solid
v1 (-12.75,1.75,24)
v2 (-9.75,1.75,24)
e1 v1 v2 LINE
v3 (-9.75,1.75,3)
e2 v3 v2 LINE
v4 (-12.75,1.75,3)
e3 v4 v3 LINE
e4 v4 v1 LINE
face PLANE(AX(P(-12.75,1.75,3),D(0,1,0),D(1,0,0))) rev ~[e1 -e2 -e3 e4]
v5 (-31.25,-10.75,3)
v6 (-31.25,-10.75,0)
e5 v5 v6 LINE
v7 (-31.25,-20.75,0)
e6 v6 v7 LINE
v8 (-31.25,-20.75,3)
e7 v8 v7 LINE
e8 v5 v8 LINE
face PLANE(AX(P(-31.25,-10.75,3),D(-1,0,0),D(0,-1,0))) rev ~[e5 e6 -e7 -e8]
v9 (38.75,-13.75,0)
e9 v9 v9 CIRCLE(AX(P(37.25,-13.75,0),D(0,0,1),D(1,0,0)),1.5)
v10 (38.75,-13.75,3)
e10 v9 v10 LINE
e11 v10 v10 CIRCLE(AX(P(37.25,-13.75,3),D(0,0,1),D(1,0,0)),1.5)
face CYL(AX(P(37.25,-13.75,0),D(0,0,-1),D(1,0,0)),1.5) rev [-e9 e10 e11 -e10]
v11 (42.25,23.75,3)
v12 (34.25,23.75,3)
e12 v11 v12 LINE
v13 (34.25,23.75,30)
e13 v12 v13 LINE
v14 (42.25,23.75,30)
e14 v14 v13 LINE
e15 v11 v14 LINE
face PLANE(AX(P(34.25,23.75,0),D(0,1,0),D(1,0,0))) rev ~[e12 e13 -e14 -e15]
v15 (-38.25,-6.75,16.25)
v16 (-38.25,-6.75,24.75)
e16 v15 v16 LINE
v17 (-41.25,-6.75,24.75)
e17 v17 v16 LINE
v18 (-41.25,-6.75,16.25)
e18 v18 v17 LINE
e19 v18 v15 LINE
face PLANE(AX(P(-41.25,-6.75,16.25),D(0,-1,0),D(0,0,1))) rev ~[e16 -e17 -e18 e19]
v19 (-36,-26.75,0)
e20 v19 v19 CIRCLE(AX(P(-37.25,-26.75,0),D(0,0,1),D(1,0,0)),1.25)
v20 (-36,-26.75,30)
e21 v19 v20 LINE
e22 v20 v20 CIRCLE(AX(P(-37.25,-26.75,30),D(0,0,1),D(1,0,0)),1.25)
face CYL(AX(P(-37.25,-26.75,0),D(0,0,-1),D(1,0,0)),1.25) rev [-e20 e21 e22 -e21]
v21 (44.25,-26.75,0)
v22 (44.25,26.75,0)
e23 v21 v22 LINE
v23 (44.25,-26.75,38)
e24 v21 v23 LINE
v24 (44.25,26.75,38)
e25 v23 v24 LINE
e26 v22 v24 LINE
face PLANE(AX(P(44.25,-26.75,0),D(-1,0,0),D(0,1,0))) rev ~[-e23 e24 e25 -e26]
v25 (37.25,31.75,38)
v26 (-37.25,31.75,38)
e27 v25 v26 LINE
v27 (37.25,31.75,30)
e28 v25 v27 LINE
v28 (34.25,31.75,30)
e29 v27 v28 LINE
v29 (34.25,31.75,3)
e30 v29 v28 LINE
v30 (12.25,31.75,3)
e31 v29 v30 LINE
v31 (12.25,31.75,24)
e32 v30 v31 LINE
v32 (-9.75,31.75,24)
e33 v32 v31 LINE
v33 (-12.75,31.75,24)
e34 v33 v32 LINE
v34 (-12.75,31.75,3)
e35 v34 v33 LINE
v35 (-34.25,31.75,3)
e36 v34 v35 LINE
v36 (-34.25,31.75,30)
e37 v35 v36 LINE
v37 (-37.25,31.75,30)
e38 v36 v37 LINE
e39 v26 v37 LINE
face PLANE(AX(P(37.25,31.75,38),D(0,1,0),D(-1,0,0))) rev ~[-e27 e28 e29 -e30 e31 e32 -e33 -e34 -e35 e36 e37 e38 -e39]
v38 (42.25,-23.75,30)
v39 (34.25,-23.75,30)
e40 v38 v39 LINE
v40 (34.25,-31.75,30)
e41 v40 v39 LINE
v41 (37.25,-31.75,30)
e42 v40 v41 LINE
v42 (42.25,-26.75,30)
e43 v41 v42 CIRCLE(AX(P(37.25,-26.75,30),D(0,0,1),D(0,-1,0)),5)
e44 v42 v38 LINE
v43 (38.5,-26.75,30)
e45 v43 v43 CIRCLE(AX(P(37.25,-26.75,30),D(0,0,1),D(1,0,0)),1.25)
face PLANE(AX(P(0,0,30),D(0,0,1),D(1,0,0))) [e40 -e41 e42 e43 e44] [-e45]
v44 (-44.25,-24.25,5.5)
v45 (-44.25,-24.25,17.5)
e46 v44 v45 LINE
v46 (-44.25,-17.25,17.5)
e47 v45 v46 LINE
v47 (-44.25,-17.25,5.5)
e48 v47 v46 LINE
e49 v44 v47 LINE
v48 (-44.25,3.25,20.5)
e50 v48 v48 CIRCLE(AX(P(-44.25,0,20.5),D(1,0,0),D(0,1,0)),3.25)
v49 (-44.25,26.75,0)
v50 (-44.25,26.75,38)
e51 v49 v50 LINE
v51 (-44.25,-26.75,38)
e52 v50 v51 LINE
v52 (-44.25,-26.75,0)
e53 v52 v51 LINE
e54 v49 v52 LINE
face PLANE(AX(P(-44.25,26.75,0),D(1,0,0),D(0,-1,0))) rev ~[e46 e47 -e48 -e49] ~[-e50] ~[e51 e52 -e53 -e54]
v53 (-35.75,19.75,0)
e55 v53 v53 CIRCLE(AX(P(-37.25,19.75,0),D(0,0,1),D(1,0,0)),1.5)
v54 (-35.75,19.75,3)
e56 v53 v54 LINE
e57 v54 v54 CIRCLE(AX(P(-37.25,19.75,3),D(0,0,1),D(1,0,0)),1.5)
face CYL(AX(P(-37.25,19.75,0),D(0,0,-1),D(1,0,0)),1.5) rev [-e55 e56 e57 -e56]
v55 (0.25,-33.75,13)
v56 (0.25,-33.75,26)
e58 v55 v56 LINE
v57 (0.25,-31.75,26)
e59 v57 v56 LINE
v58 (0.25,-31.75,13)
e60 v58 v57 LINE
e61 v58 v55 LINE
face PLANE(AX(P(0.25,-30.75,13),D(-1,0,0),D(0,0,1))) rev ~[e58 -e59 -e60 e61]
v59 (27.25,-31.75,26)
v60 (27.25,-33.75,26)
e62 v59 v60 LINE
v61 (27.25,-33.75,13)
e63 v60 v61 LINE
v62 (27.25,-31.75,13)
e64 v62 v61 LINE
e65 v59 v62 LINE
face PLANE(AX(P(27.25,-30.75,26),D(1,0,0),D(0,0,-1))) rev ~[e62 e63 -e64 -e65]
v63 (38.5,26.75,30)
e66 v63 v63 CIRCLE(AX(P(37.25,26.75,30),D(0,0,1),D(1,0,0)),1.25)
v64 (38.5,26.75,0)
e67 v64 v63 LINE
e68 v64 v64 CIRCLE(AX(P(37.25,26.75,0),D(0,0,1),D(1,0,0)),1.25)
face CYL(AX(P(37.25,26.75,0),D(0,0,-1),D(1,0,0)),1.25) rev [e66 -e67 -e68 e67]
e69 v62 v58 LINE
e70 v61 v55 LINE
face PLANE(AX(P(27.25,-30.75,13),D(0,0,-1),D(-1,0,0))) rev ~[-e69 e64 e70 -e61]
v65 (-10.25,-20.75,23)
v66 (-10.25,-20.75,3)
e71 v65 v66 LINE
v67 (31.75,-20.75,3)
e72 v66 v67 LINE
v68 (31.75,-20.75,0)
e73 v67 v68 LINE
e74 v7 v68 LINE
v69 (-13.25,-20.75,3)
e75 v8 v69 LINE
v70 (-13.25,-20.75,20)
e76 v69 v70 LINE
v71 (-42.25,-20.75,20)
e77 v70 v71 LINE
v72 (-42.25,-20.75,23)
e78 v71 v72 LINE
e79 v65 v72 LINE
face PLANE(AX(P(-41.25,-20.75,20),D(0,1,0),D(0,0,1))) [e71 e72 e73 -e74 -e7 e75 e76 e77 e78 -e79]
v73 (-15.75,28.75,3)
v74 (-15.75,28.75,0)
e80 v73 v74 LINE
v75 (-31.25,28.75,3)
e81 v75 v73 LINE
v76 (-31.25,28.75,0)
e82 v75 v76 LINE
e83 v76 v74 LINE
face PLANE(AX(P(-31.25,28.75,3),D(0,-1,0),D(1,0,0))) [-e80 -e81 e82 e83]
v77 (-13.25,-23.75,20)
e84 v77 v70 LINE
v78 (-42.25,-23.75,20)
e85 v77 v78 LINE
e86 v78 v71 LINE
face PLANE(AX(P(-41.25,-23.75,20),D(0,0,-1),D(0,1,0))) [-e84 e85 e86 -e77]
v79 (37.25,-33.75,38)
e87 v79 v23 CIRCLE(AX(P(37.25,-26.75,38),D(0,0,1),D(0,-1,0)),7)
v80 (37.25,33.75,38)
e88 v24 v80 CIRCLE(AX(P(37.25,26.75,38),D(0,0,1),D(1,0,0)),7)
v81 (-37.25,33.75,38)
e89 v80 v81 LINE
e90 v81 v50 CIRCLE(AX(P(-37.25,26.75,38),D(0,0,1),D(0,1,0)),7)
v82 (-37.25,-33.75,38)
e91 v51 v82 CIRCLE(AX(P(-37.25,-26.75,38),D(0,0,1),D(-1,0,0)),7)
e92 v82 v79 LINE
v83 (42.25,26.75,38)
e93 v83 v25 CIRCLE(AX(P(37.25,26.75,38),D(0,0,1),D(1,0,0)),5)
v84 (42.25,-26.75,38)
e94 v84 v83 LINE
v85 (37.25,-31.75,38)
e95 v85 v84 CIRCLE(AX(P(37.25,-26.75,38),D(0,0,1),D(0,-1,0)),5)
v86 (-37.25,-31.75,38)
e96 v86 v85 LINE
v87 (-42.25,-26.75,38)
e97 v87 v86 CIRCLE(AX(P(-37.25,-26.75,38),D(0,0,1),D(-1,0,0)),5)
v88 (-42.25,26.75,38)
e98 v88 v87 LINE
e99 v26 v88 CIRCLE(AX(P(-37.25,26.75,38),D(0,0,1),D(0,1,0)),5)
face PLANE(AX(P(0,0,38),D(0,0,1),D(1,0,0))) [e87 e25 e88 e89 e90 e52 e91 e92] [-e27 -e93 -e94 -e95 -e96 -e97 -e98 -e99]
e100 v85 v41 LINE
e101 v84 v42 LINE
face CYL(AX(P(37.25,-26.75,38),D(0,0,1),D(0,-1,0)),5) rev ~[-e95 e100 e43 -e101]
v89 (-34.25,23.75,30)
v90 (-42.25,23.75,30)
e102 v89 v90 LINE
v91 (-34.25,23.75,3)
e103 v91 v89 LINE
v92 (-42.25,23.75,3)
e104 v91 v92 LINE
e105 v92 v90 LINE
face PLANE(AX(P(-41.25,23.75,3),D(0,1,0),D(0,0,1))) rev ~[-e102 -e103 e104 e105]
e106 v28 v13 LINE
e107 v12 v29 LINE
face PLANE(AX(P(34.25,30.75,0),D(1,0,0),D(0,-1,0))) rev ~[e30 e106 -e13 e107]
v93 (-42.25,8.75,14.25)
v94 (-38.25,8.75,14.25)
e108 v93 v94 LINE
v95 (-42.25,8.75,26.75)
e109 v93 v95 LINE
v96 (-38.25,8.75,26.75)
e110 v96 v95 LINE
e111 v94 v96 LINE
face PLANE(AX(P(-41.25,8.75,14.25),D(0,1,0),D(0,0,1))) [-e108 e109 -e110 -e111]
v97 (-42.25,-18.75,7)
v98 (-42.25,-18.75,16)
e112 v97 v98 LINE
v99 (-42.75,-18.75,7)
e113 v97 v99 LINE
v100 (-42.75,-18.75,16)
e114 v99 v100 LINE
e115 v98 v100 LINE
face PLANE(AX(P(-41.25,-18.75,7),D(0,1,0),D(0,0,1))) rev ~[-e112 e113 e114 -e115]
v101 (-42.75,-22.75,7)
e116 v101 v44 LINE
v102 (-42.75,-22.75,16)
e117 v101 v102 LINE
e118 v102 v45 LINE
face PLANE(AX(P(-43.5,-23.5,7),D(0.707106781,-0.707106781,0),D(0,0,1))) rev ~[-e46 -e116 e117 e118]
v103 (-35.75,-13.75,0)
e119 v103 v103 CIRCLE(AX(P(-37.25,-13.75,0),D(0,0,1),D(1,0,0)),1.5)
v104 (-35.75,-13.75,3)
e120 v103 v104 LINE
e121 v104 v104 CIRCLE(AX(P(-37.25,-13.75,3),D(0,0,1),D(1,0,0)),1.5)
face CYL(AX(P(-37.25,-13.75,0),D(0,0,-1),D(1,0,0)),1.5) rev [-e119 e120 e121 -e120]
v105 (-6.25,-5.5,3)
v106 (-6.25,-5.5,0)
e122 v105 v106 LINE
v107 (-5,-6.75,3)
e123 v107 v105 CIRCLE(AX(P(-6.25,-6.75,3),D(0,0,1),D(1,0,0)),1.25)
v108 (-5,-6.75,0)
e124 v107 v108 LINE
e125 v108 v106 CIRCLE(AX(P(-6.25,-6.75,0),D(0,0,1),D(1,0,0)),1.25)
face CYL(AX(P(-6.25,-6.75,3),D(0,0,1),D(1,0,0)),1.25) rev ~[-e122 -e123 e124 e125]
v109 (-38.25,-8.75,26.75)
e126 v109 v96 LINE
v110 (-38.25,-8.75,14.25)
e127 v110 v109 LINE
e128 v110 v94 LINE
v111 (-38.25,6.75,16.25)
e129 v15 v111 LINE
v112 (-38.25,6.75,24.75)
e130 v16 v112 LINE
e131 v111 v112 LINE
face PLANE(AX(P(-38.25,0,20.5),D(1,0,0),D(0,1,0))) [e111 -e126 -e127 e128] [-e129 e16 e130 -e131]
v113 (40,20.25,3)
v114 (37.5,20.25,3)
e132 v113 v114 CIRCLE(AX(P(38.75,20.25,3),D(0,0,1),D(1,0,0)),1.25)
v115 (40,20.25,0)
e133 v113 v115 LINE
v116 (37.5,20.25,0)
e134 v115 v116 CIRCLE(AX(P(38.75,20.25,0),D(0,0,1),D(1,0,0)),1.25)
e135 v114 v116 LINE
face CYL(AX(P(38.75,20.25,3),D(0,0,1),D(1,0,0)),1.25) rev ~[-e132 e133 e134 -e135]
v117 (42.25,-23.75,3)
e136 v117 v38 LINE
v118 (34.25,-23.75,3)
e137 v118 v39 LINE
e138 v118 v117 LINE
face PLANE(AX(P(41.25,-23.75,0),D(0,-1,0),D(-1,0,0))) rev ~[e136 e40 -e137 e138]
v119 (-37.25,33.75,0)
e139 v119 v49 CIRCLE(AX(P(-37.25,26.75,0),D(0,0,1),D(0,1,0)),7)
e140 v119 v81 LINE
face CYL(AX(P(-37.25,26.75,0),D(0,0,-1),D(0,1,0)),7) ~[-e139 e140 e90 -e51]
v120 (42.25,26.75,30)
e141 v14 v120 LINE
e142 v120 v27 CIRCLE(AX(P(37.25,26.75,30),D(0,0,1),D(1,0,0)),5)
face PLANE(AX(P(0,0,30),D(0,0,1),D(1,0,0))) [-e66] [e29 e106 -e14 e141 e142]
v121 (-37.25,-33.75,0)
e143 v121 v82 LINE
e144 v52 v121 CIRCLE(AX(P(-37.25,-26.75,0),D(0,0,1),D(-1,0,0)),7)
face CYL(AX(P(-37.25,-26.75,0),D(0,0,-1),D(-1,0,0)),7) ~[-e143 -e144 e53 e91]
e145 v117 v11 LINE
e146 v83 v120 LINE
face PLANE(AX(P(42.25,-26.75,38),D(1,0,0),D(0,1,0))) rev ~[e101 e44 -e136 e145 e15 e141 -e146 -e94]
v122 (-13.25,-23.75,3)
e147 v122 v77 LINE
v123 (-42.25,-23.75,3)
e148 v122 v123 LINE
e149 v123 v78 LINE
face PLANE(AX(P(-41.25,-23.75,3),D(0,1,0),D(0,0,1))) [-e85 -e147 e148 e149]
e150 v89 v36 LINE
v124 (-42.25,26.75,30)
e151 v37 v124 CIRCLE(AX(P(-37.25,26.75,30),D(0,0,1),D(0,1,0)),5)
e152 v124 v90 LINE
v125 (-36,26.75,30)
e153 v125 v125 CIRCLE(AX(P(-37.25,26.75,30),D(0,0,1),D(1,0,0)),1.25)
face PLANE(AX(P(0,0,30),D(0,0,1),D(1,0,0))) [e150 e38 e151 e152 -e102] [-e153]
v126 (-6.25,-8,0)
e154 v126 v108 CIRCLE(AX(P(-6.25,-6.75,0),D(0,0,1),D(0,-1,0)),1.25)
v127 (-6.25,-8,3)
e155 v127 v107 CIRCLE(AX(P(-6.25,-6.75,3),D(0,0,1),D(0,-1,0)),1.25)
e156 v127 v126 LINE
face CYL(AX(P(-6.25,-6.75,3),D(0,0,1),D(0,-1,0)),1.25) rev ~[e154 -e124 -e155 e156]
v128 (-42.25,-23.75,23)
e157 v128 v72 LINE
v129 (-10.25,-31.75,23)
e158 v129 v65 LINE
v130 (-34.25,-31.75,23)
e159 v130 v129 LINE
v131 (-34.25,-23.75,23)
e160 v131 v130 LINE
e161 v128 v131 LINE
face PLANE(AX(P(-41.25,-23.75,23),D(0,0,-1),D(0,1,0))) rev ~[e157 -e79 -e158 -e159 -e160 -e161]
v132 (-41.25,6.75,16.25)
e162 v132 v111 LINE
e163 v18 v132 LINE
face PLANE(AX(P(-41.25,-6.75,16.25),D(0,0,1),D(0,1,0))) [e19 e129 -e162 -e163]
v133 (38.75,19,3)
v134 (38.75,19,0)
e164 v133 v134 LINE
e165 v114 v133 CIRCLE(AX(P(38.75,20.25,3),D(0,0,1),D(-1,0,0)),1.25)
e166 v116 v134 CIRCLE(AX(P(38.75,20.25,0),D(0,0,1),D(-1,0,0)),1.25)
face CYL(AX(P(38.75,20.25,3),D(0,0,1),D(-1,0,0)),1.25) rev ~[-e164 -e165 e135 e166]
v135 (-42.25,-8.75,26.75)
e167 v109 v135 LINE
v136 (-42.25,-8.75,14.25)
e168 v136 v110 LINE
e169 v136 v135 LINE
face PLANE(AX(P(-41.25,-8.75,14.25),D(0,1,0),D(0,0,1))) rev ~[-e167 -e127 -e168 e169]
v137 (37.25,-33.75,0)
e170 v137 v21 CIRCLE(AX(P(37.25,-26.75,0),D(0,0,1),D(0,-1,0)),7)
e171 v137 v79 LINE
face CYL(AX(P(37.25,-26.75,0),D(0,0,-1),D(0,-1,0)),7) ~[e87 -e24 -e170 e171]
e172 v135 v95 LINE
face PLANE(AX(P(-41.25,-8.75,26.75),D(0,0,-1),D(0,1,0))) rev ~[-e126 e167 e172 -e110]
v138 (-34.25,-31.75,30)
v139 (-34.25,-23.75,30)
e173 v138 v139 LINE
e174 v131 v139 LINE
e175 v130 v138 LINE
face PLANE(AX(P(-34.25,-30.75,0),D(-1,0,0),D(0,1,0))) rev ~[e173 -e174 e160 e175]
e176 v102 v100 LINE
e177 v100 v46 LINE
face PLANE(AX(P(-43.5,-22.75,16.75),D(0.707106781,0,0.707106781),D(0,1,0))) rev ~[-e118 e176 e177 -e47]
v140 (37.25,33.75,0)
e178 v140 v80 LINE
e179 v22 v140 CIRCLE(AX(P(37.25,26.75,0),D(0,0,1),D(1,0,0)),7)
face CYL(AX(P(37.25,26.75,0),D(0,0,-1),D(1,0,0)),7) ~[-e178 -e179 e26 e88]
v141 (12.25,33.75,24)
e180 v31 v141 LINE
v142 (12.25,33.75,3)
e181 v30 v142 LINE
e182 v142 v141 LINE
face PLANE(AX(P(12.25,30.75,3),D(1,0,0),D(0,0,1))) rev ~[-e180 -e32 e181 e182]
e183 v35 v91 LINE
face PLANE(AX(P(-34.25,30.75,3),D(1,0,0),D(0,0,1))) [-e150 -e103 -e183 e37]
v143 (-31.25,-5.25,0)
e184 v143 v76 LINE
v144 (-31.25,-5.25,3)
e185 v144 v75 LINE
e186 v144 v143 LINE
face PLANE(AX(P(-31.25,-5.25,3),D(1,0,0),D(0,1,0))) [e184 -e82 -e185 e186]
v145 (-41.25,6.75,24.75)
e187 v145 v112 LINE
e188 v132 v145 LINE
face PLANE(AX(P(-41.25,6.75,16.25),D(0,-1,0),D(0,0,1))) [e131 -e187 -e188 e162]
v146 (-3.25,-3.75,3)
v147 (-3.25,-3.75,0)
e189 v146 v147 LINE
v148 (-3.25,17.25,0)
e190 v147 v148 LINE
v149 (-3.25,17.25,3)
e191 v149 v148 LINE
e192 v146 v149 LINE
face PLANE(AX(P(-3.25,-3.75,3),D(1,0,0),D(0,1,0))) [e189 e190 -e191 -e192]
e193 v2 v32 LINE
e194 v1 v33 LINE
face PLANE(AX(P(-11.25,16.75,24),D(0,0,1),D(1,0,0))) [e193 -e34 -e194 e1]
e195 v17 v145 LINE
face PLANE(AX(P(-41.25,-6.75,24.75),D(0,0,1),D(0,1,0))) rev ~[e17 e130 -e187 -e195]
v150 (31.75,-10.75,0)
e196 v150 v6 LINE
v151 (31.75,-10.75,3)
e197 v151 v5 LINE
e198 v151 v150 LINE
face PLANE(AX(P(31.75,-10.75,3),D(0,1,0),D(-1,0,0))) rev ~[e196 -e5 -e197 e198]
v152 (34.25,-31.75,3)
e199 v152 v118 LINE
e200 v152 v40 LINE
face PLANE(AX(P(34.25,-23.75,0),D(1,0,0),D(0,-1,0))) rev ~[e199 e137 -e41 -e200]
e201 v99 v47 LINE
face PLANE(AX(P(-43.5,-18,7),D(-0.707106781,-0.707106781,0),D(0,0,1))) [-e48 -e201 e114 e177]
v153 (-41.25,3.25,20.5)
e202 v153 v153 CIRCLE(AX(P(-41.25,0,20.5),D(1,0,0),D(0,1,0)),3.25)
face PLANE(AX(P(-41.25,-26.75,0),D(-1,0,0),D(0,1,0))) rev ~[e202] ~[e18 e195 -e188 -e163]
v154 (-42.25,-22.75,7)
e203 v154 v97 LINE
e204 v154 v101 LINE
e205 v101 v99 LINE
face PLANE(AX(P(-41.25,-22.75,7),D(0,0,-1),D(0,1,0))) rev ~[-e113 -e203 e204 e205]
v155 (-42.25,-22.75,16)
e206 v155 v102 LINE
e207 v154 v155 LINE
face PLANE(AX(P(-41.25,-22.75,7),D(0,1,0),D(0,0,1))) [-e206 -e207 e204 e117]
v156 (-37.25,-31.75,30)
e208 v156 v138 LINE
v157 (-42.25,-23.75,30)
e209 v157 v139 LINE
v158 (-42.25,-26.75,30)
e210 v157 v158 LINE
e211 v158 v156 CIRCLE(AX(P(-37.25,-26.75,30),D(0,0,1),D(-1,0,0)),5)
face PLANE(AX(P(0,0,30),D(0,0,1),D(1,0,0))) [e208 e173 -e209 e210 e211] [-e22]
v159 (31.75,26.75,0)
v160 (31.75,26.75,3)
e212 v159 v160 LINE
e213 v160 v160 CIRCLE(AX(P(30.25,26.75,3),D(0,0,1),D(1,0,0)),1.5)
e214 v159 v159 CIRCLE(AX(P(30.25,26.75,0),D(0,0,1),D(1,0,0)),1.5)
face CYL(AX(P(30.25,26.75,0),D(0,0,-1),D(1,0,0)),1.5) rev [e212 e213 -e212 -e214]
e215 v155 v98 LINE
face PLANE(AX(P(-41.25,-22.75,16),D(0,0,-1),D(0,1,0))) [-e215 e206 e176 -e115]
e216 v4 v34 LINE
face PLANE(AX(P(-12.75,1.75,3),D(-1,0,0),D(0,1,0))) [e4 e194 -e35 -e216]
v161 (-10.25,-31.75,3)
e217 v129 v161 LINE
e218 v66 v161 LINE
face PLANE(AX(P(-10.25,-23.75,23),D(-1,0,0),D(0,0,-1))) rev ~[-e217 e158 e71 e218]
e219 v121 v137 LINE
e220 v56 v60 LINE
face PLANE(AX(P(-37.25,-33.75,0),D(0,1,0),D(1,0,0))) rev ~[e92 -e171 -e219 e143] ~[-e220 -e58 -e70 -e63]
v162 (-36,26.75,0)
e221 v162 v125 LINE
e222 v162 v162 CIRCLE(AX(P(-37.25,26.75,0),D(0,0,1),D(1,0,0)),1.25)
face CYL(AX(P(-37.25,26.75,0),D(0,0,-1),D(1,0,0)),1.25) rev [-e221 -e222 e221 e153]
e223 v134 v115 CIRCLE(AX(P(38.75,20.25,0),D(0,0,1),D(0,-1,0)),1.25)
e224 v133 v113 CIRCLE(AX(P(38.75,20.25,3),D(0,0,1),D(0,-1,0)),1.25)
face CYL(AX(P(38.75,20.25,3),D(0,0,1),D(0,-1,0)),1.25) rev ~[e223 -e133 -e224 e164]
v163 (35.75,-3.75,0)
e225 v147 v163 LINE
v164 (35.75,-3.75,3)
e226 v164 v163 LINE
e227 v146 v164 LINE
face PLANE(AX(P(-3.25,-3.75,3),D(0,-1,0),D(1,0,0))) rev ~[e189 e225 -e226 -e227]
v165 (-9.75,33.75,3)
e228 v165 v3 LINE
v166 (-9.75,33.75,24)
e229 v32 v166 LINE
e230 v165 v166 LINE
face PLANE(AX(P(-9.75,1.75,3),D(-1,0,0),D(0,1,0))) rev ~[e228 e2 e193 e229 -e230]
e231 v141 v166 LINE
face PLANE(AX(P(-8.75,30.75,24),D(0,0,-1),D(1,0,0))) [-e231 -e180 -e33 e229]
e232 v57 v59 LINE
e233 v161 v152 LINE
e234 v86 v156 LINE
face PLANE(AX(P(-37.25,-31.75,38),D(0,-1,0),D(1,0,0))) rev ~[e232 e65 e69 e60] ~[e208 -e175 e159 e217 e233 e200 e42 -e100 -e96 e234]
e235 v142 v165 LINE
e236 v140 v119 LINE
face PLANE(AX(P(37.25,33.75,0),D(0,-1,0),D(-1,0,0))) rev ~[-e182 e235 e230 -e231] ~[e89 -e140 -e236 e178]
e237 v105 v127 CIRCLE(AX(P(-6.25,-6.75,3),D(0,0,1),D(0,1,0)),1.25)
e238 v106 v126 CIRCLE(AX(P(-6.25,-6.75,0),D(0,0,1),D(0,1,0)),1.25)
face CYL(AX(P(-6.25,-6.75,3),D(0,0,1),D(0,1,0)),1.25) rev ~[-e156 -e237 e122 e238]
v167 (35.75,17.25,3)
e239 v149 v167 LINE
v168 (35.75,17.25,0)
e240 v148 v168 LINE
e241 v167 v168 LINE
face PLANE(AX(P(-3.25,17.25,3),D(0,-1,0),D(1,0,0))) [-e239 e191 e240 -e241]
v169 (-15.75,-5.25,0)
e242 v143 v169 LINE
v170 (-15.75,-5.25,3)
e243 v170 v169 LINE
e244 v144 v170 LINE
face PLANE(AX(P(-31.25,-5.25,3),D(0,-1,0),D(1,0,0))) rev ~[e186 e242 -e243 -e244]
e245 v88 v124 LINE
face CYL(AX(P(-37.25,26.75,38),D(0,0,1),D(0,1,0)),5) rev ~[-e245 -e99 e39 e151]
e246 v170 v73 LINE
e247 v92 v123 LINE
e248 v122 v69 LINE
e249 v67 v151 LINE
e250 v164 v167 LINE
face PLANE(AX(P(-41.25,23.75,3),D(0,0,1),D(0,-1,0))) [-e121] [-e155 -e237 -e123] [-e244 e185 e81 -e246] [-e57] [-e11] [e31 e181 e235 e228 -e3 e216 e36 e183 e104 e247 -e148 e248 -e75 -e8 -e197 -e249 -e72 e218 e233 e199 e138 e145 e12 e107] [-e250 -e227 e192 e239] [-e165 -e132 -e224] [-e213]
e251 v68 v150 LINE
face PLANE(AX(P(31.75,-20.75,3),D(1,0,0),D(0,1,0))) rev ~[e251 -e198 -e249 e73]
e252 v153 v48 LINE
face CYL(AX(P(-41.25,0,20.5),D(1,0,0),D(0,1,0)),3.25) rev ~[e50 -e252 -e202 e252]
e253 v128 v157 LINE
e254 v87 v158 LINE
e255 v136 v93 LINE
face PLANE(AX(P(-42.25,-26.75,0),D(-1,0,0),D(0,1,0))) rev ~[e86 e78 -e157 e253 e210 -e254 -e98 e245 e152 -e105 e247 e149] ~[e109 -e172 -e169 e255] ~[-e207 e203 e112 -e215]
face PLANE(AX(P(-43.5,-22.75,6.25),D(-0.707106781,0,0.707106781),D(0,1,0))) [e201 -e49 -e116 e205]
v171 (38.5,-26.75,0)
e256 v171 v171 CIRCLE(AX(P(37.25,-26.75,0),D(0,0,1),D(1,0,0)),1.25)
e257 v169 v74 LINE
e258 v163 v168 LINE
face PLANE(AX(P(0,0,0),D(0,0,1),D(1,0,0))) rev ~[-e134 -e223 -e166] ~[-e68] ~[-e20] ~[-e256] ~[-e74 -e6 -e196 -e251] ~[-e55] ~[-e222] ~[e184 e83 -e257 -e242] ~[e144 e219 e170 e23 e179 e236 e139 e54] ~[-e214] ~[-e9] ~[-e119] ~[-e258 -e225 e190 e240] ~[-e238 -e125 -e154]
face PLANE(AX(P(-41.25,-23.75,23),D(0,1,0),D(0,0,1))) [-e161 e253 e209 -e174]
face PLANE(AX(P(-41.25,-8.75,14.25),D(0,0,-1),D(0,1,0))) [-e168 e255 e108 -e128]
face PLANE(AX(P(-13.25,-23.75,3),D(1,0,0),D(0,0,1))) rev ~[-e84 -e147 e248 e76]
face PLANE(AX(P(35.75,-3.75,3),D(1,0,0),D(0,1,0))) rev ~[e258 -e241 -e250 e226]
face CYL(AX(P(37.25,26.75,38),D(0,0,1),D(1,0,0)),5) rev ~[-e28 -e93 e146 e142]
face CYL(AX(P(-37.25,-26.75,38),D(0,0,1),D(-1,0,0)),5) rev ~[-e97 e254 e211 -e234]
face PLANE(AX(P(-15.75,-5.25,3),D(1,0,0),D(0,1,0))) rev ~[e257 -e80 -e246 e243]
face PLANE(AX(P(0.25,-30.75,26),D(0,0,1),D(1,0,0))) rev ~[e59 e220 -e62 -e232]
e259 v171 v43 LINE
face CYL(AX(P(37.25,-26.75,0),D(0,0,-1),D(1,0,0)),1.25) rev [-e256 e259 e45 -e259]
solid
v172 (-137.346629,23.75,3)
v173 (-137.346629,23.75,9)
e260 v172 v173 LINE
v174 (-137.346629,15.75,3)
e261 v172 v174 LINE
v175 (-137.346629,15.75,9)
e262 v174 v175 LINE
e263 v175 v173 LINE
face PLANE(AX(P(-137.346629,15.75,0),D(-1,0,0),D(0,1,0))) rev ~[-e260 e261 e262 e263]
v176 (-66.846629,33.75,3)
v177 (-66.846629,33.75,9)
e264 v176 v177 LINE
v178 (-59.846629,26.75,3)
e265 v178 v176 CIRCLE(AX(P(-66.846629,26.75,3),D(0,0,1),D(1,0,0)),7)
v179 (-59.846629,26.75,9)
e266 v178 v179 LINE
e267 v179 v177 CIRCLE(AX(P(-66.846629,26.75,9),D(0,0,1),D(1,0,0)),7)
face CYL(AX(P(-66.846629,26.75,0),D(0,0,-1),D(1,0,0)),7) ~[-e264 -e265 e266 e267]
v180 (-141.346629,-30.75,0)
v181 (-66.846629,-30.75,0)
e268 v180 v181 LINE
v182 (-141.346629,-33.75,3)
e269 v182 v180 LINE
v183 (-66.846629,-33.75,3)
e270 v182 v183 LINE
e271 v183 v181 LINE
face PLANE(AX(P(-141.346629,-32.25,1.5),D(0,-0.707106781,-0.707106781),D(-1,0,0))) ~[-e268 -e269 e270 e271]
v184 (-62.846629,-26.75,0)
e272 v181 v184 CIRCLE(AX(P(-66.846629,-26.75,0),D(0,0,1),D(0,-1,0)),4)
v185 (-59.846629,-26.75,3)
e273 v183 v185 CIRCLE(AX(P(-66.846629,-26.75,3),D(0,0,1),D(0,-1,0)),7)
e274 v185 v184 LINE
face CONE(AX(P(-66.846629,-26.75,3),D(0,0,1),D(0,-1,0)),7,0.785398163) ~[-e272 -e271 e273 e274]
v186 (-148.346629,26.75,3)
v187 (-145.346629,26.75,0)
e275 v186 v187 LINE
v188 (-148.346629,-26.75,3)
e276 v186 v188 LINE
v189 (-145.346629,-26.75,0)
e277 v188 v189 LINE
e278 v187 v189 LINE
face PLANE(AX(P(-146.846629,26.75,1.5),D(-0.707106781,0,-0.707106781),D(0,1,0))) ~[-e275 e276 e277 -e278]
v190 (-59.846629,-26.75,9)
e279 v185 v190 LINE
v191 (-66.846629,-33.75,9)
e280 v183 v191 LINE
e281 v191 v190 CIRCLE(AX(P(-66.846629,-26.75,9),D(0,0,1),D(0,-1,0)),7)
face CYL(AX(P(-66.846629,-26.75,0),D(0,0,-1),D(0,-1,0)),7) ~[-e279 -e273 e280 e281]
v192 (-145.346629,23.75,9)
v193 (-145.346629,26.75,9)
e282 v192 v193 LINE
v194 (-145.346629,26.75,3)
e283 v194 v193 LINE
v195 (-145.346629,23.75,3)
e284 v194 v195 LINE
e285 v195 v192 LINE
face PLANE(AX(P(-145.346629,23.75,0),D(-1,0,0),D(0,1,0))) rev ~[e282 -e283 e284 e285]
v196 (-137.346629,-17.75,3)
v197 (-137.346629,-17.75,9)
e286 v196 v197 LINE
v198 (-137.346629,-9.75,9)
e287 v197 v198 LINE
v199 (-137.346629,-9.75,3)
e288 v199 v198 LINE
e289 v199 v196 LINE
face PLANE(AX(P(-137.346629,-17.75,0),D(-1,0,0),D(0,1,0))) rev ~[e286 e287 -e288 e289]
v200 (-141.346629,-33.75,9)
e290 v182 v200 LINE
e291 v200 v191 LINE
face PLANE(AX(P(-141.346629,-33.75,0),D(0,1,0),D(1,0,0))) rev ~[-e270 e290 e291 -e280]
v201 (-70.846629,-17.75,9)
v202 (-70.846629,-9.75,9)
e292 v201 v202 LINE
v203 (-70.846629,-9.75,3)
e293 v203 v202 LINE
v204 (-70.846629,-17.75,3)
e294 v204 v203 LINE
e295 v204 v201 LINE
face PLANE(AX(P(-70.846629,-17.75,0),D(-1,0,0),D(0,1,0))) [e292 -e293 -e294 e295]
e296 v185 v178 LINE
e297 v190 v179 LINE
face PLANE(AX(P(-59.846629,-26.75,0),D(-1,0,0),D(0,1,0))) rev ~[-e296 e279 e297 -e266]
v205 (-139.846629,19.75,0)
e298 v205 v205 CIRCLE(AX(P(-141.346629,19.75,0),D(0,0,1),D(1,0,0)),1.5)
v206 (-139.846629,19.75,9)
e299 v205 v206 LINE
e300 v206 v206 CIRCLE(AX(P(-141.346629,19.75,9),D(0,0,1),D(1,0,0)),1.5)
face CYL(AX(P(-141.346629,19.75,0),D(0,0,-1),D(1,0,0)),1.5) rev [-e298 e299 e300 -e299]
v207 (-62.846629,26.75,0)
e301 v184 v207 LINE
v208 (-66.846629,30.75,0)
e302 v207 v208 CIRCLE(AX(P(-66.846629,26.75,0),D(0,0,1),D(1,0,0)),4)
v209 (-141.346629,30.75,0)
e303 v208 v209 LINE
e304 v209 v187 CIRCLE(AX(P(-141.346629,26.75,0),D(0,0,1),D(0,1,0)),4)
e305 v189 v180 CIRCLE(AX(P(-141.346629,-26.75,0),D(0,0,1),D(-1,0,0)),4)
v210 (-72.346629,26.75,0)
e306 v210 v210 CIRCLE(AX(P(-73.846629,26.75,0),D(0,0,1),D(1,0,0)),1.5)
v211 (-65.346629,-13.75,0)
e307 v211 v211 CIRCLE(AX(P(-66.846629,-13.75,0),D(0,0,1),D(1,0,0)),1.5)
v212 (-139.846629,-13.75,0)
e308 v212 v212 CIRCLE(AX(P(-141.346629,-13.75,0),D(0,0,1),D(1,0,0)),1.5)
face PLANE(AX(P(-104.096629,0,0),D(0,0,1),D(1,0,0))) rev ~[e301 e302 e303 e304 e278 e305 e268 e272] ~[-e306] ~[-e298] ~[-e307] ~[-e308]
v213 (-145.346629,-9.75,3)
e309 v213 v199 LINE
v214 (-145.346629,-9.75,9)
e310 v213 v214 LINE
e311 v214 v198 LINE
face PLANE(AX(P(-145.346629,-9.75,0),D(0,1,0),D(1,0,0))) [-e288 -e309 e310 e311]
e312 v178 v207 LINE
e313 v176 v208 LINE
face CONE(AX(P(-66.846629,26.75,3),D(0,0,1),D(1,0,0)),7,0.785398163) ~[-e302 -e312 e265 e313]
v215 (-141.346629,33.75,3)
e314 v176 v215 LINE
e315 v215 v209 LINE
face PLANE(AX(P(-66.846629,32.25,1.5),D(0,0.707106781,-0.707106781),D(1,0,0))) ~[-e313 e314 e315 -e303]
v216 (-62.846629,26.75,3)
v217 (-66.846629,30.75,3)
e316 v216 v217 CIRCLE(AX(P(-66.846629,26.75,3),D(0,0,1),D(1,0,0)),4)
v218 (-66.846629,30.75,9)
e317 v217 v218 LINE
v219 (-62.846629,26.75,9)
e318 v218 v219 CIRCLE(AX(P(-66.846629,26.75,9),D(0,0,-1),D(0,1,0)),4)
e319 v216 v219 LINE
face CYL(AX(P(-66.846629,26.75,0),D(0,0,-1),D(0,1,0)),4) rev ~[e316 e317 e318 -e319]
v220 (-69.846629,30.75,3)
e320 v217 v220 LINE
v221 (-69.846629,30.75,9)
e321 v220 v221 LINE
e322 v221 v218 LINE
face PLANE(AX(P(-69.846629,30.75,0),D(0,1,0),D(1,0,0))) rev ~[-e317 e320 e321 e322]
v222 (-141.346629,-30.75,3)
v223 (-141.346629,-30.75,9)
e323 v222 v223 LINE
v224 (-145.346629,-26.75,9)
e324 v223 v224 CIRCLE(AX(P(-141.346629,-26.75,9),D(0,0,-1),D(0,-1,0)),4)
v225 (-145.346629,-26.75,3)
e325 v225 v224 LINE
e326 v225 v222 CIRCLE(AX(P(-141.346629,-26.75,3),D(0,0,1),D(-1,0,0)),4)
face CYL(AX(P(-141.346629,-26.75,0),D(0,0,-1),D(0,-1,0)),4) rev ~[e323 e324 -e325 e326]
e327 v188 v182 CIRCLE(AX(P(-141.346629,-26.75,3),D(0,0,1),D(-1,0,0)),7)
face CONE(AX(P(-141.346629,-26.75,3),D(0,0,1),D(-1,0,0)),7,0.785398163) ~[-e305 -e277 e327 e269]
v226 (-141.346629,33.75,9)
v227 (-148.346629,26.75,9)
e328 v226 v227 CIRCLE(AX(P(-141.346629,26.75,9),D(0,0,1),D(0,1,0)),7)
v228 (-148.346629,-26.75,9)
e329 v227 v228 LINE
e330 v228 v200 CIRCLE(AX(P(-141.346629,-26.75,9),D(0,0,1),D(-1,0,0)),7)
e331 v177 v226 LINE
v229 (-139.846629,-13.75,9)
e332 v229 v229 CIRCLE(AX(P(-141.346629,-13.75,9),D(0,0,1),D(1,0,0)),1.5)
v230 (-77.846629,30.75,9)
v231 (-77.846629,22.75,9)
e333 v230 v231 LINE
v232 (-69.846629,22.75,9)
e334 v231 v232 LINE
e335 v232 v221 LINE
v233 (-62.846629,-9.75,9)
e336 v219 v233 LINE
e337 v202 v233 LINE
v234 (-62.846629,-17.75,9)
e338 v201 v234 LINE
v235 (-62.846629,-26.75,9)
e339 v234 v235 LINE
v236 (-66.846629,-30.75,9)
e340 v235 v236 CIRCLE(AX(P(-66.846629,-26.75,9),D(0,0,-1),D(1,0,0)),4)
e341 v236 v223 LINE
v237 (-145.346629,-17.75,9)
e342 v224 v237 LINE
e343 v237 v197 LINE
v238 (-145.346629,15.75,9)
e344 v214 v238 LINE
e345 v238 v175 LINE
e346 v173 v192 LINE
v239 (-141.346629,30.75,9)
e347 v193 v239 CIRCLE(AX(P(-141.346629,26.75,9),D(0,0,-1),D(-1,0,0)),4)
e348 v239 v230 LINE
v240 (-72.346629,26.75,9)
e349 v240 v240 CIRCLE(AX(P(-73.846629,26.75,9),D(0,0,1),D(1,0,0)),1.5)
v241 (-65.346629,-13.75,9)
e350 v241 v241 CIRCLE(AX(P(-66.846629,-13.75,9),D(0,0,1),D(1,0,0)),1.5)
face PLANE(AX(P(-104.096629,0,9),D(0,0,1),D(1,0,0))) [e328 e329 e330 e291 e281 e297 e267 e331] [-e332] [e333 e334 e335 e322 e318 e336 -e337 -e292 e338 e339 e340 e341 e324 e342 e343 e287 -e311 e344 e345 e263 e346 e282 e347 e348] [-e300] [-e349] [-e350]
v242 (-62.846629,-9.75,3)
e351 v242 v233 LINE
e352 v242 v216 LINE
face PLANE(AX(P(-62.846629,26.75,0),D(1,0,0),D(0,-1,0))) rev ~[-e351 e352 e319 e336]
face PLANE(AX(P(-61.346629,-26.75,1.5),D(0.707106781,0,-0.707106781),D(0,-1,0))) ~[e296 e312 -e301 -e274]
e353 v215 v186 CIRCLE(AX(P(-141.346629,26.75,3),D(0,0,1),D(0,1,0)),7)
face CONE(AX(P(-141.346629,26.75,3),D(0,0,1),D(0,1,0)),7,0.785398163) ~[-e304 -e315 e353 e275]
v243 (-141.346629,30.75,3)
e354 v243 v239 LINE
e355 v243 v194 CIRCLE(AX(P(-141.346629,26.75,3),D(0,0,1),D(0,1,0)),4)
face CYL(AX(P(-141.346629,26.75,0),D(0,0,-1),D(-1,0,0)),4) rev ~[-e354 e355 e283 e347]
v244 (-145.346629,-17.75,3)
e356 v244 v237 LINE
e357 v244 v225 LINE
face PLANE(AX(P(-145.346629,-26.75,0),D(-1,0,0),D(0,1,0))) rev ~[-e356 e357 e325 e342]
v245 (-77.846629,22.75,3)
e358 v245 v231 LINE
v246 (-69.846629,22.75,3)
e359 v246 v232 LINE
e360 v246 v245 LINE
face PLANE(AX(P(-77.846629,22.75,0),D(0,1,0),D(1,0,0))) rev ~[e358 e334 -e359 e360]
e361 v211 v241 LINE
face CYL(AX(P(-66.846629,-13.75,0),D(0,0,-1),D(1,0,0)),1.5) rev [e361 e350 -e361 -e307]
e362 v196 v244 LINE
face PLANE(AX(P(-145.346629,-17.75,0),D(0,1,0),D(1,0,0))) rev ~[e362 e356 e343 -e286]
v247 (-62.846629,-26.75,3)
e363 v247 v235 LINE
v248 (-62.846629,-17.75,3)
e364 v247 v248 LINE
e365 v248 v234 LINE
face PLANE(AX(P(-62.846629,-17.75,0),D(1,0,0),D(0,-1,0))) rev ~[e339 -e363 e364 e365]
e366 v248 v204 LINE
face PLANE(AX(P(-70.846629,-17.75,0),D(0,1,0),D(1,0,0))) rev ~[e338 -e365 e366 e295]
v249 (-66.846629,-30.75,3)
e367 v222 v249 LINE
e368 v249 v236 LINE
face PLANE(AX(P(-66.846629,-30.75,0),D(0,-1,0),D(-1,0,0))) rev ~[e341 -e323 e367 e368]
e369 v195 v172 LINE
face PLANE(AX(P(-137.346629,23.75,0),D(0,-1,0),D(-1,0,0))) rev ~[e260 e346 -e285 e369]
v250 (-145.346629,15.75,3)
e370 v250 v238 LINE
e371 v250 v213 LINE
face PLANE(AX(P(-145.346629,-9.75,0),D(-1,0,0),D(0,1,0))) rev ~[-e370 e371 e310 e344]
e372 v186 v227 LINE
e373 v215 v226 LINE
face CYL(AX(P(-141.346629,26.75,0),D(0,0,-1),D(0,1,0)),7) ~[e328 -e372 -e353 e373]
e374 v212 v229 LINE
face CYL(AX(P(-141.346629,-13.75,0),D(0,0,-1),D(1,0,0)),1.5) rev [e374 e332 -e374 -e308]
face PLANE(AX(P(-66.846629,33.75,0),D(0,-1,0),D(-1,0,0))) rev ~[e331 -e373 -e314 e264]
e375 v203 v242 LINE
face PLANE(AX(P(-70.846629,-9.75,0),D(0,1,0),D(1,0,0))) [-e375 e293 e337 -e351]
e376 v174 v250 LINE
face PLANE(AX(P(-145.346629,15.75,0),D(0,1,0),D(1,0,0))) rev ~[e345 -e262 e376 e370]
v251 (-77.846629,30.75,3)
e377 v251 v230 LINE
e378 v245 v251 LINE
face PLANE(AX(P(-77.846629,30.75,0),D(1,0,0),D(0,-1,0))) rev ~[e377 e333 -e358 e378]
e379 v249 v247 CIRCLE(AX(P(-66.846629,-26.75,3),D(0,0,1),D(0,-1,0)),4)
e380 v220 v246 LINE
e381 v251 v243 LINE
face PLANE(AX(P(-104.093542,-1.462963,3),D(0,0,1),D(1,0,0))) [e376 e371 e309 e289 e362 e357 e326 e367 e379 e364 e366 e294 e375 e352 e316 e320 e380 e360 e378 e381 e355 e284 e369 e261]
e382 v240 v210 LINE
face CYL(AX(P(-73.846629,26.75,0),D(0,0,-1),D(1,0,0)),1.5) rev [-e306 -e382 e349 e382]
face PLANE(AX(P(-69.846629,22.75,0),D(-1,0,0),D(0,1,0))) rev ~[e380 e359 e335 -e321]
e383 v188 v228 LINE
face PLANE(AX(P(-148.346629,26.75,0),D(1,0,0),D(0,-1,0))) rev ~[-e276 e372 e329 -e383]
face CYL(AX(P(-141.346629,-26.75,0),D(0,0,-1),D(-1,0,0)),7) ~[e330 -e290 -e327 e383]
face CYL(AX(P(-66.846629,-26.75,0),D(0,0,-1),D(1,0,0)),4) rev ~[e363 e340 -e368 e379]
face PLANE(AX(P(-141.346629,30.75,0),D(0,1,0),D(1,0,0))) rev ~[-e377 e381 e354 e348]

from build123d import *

# Parameters (mm, degrees)
F0_R      = 1.5
F1_DEPTH  = 3
F2_DEPTH  = 38
F0_R_2    = 1.25
F3_DEPTH  = 30
F4_W      = 21
F4_H      = 17
F5_DEPTH  = 7
F7_DEPTH  = 3
F8_W      = 4
F8_H      = 9
F9_DEPTH  = 25
F10_SIZE  = 1.5
F12_W     = 21
F12_H     = 21
F13_DEPTH = 25
F14_DEPTH = 25
F15_R     = 1.5
F15_R_2   = 1.25
F16_DEPTH = 3
F15_W     = 8
F15_H     = 8
F17_DEPTH = 9
F18_SIZE  = 3
F19_DEPTH = 25
F8_W_2    = 17.5
F8_H_2    = 12.5
F8_W_3    = 13.5
F8_H_3    = 8.5
F20_DEPTH = 4
F8_R      = 3.25
F21_DEPTH = 25
F23_DEPTH = 8
F24_DEPTH = 1
F25_DEPTH = 1
F26_DEPTH = 1
F27_DEPTH = 1
F28_DEPTH = 1
F29_W     = 3
F29_H     = 30
F30_DEPTH = 21
F31_DEPTH = 1
F29_W_2   = 15.5
F29_H_2   = 34
F32_DEPTH = 25
F33_DEPTH = 25
F11_W     = 39
F11_H     = 21
F34_DEPTH = 25
F36_DEPTH = 25


# Not quite as in the source:
# - a feature names something its author has since deleted; it is built from what else it names


with BuildPart() as f1:
    # F0 (on Top) → F1 (new body)
    with BuildSketch(Plane.XY):
        Polygon((-34.25, -30.75), (34.25, -30.75), (34.25, -23.75), (41.25, -23.75), (41.25, 23.75), (34.25, 23.75), (34.25, 30.75), (-34.25, 30.75), (-34.25, 23.75), (-41.25, 23.75), (-41.25, -23.75), (-34.25, -23.75), align=None)
        with Locations((-37.25, -13.75)):
            Circle(F0_R, mode=Mode.SUBTRACT)
        with Locations((37.25, -13.75)):
            Circle(F0_R, mode=Mode.SUBTRACT)
        with Locations((-37.25, 19.75)):
            Circle(F0_R, mode=Mode.SUBTRACT)
        with Locations((30.25, 26.75)):
            Circle(F0_R, mode=Mode.SUBTRACT)
    extrude(amount=F1_DEPTH)

    # F0 (on Top) → F2 (join)
    with BuildSketch(Plane.XY):
        with BuildLine():
            Line((44.25, -26.75), (44.25, 26.75))
            ThreePointArc((44.25, 26.75), (42.1997474683, 31.6997474683), (37.25, 33.75))
            Line((37.25, 33.75), (-37.25, 33.75))
            ThreePointArc((-37.25, 33.75), (-42.1997474683, 31.6997474683), (-44.25, 26.75))
            Line((-44.25, 26.75), (-44.25, -26.75))
            ThreePointArc((-44.25, -26.75), (-42.1997474683, -31.6997474683), (-37.25, -33.75))
            Line((-37.25, -33.75), (37.25, -33.75))
            ThreePointArc((37.25, -33.75), (42.1997474683, -31.6997474683), (44.25, -26.75))
        make_face()
        with BuildLine():
            ThreePointArc((41.25, -26.75), (40.0784271247, -29.5784271247), (37.25, -30.75))
            Line((37.25, -30.75), (34.25, -30.75))
            Line((34.25, -30.75), (-34.25, -30.75))
            Line((-34.25, -30.75), (-37.25, -30.75))
            ThreePointArc((-37.25, -30.75), (-40.0784271247, -29.5784271247), (-41.25, -26.75))
            Line((-41.25, -26.75), (-41.25, -23.75))
            Line((-41.25, -23.75), (-41.25, 23.75))
            Line((-41.25, 23.75), (-41.25, 26.75))
            ThreePointArc((-41.25, 26.75), (-40.0784271247, 29.5784271247), (-37.25, 30.75))
            Line((-37.25, 30.75), (-34.25, 30.75))
            Line((-34.25, 30.75), (34.25, 30.75))
            Line((34.25, 30.75), (37.25, 30.75))
            ThreePointArc((37.25, 30.75), (40.0784271247, 29.5784271247), (41.25, 26.75))
            Line((41.25, 26.75), (41.25, 23.75))
            Line((41.25, 23.75), (41.25, -23.75))
            Line((41.25, -23.75), (41.25, -26.75))
        make_face(mode=Mode.SUBTRACT)
    extrude(amount=F2_DEPTH)

    # F0 (on Top) → F3 (join)
    with BuildSketch(Plane.XY):
        with BuildLine():
            Line((-41.25, 26.75), (-41.25, 23.75))
            Line((-41.25, 23.75), (-34.25, 23.75))
            Line((-34.25, 23.75), (-34.25, 30.75))
            Line((-34.25, 30.75), (-37.25, 30.75))
            ThreePointArc((-37.25, 30.75), (-40.0784271247, 29.5784271247), (-41.25, 26.75))
        make_face()
        with Locations((-37.25, 26.75)):
            Circle(F0_R_2, mode=Mode.SUBTRACT)
        with BuildLine():
            Line((-37.25, -30.75), (-34.25, -30.75))
            Line((-34.25, -30.75), (-34.25, -23.75))
            Line((-34.25, -23.75), (-41.25, -23.75))
            Line((-41.25, -23.75), (-41.25, -26.75))
            ThreePointArc((-41.25, -26.75), (-40.0784271247, -29.5784271247), (-37.25, -30.75))
        make_face()
        with Locations((-37.25, -26.75)):
            Circle(F0_R_2, mode=Mode.SUBTRACT)
        with BuildLine():
            Line((34.25, 23.75), (41.25, 23.75))
            Line((41.25, 23.75), (41.25, 26.75))
            ThreePointArc((41.25, 26.75), (40.0784271247, 29.5784271247), (37.25, 30.75))
            Line((37.25, 30.75), (34.25, 30.75))
            Line((34.25, 30.75), (34.25, 23.75))
        make_face()
        with Locations((37.25, 26.75)):
            Circle(F0_R_2, mode=Mode.SUBTRACT)
        with BuildLine():
            Line((34.25, -30.75), (37.25, -30.75))
            ThreePointArc((37.25, -30.75), (40.0784271247, -29.5784271247), (41.25, -26.75))
            Line((41.25, -26.75), (41.25, -23.75))
            Line((41.25, -23.75), (34.25, -23.75))
            Line((34.25, -23.75), (34.25, -30.75))
        make_face()
        with Locations((37.25, -26.75)):
            Circle(F0_R_2, mode=Mode.SUBTRACT)
    extrude(amount=F3_DEPTH)

    # F4 (on face) → F5 (join)
    with BuildSketch(Plane(origin=(0, -30.75, 0), x_dir=(-1, 0, 0), z_dir=(0, 1, 0))):
        Polygon((10.25, 3), (13.25, 3), (13.25, 20), (34.25, 20), (34.25, 23), (10.25, 23), align=None)
        with Locations((23.75, 11.5)):
            Rectangle(F4_W, F4_H)
    extrude(amount=F5_DEPTH)

    # F6 (on face) → F7 (join)
    with BuildSketch(Plane(origin=(0, -23.75, 0), x_dir=(-1, 0, 0), z_dir=(0, 1, 0))):
        Polygon((41.25, 23), (34.25, 23), (10.25, 23), (10.25, 3), (13.25, 3), (13.25, 20), (41.25, 20), align=None)
    extrude(amount=F7_DEPTH)

    # F8 (on face) → F9 (cut)
    with BuildSketch(Plane.YZ.offset(-41.25)):
        with Locations((-20.75, 11.5)):
            Rectangle(F8_W, F8_H)
    extrude(amount=-F9_DEPTH, mode=Mode.SUBTRACT)

    # F10
    f10_edges = [f1.edges().sort_by_distance(p)[0] for p in [
        (-44.25, -18.75, 11.5),
        (-44.25, -20.75, 7),
        (-44.25, -22.75, 11.5),
        (-44.25, -20.75, 16),
    ]]
    chamfer(f10_edges, length=F10_SIZE)

    # F12 (on face) → F13 (cut)
    with BuildSketch(Plane.XZ.offset(-30.75)):
        with Locations((1.75, 13.5)):
            Rectangle(F12_W, F12_H)
    extrude(amount=-F13_DEPTH, mode=Mode.SUBTRACT)

    # F4 (on face) → F14 (cut)
    with BuildSketch(Plane(origin=(0, -30.75, 0), x_dir=(-1, 0, 0), z_dir=(0, 1, 0))):
        Polygon((-0.25, 26), (-3.25, 26), (-27.25, 26), (-27.25, 16), (-27.25, 13), (-0.25, 13), align=None)
    extrude(amount=-F14_DEPTH, mode=Mode.SUBTRACT)

    # F11 (on face) → F19 (cut)
    with BuildSketch(Plane.XY.offset(3)):
        with BuildLine():
            Line((38.75, 20.25), (40, 20.25))
            ThreePointArc((40, 20.25), (38.75, 21.5), (37.5, 20.25))
            Line((37.5, 20.25), (38.75, 20.25))
        make_face()
        with BuildLine():
            Line((38.75, 20.25), (37.5, 20.25))
            ThreePointArc((37.5, 20.25), (37.8661165235, 19.3661165235), (38.75, 19))
            Line((38.75, 19), (38.75, 20.25))
        make_face()
        with BuildLine():
            ThreePointArc((38.75, 19), (39.6338834765, 19.3661165235), (40, 20.25))
            Line((40, 20.25), (38.75, 20.25))
            Line((38.75, 20.25), (38.75, 19))
        make_face()
    extrude(amount=-F19_DEPTH, mode=Mode.SUBTRACT)

    # F8 (on face) → F20 (join)
    with BuildSketch(Plane.YZ.offset(-41.25)):
        with Locations((0, 20.5)):
            Rectangle(F8_W_2, F8_H_2)
        with Locations((0, 20.5)):
            Rectangle(F8_W_3, F8_H_3, mode=Mode.SUBTRACT)
    extrude(amount=F20_DEPTH)

    # F8 (on face) → F21 (cut)
    with BuildSketch(Plane.YZ.offset(-41.25)):
        with Locations((0, 20.5)):
            Circle(F8_R)
    extrude(amount=-F21_DEPTH, mode=Mode.SUBTRACT)

    # F22 (on face) → F23 (cut)
    with BuildSketch(Plane.XY.offset(38)):
        with BuildLine():
            Line((-42.25, 26.75), (-42.25, -26.75))
            ThreePointArc((-42.25, -26.75), (-40.7855339059, -30.2855339059), (-37.25, -31.75))
            Line((-37.25, -31.75), (37.25, -31.75))
            ThreePointArc((37.25, -31.75), (40.7855339059, -30.2855339059), (42.25, -26.75))
            Line((42.25, -26.75), (42.25, 26.75))
            ThreePointArc((42.25, 26.75), (40.7855339059, 30.2855339059), (37.25, 31.75))
            Line((37.25, 31.75), (-37.25, 31.75))
            ThreePointArc((-37.25, 31.75), (-40.7855339059, 30.2855339059), (-42.25, 26.75))
        make_face()
        with BuildLine():
            Line((41.25, 26.75), (41.25, -26.75))
            ThreePointArc((41.25, -26.75), (40.0784271247, -29.5784271247), (37.25, -30.75))
            Line((37.25, -30.75), (-37.25, -30.75))
            ThreePointArc((-37.25, -30.75), (-40.0784271247, -29.5784271247), (-41.25, -26.75))
            Line((-41.25, -26.75), (-41.25, 26.75))
            ThreePointArc((-41.25, 26.75), (-40.0784271247, 29.5784271247), (-37.25, 30.75))
            Line((-37.25, 30.75), (37.25, 30.75))
            ThreePointArc((37.25, 30.75), (40.0784271247, 29.5784271247), (41.25, 26.75))
        make_face(mode=Mode.SUBTRACT)
    extrude(amount=-F23_DEPTH, mode=Mode.SUBTRACT)

    # F24 (cut): a face of the model
    f24_faces = [f1.faces().sort_by_distance(p)[0] for p in [
        (-41.25, -22.25, 23.5463744137),
    ]]
    extrude(f24_faces, amount=-F24_DEPTH, mode=Mode.SUBTRACT)

    # F25 (cut): a face of the model
    f25_faces = [f1.faces().sort_by_distance(p)[0] for p in [
        (-21.5, 30.75, 3.7362913825),
    ]]
    extrude(f25_faces, amount=-F25_DEPTH, mode=Mode.SUBTRACT)

    # F26 (cut): a face of the model
    f26_faces = [f1.faces().sort_by_distance(p)[0] for p in [
        (41.25, 0, 16.5),
    ]]
    extrude(f26_faces, amount=-F26_DEPTH, mode=Mode.SUBTRACT)

    # F27 (cut): a face of the model
    f27_faces = [f1.faces().sort_by_distance(p)[0] for p in [
        (12, -30.75, 3.7362913825),
    ]]
    extrude(f27_faces, amount=-F27_DEPTH, mode=Mode.SUBTRACT)

    # F28 (cut): a face of the model
    f28_faces = [f1.faces().sort_by_distance(p)[0] for p in [
        (-37.25, 0, 26.5349418683),
    ]]
    extrude(f28_faces, amount=-F28_DEPTH, mode=Mode.SUBTRACT)

    # F29 (on face) → F30 (join)
    with BuildSketch(Plane.XY.offset(3)):
        with Locations((-11.25, 16.75)):
            Rectangle(F29_W, F29_H)
    extrude(amount=F30_DEPTH)

    # F31 (cut): a face of the model
    f31_faces = [f1.faces().sort_by_distance(p)[0] for p in [
        (-8.75, 32.75, 13.5),
    ]]
    extrude(f31_faces, amount=-F31_DEPTH, mode=Mode.SUBTRACT)

    # F29 (on face) → F32 (cut)
    with BuildSketch(Plane.XY.offset(3)):
        with Locations((-23.5, 11.75)):
            Rectangle(F29_W_2, F29_H_2)
    extrude(amount=-F32_DEPTH, mode=Mode.SUBTRACT)

    # F11 (on face) → F33 (cut)
    with BuildSketch(Plane.XY.offset(3)):
        with BuildLine():
            ThreePointArc((-5, -6.75), (-5.3661165235, -5.8661165235), (-6.25, -5.5))
            Line((-6.25, -5.5), (-6.25, -6.75))
            Line((-6.25, -6.75), (-5, -6.75))
        make_face()
        with BuildLine():
            ThreePointArc((-6.25, -5.5), (-7.5, -6.75), (-6.25, -8))
            Line((-6.25, -8), (-6.25, -6.75))
            Line((-6.25, -6.75), (-6.25, -5.5))
        make_face()
        with BuildLine():
            Line((-6.25, -6.75), (-6.25, -8))
            ThreePointArc((-6.25, -8), (-5.3661165235, -7.6338834765), (-5, -6.75))
            Line((-5, -6.75), (-6.25, -6.75))
        make_face()
    extrude(amount=-F33_DEPTH, mode=Mode.SUBTRACT)

    # F11 (on face) → F34 (cut)
    with BuildSketch(Plane.XY.offset(3)):
        with Locations((16.25, 6.75)):
            Rectangle(F11_W, F11_H)
    extrude(amount=-F34_DEPTH, mode=Mode.SUBTRACT)

    # F35 (on face) → F36 (cut)
    with BuildSketch(Plane.XY.offset(3)):
        Polygon((-31.25, -10.75), (-31.25, -20.75), (-13.25, -20.75), (-10.25, -20.75), (31.75, -20.75), (31.75, -10.75), align=None)
    extrude(amount=-F36_DEPTH, mode=Mode.SUBTRACT)


with BuildPart() as f16:
    # F15 (on Top) → F16 (new body)
    with BuildSketch(Plane.XY):
        Polygon((-138.3466287255, -30.75), (-69.8466287255, -30.75), (-69.8466287255, -23.75), (-62.8466287255, -23.75), (-62.8466287255, -17.75), (-70.8466287255, -17.75), (-70.8466287255, -9.75), (-62.8466287255, -9.75), (-62.8466287255, -3.75), (-62.8466287255, 15.75), (-62.8466287255, 23.75), (-69.8466287255, 23.75), (-69.8466287255, 22.75), (-77.8466287255, 22.75), (-77.8466287255, 30.75), (-138.3466287255, 30.75), (-138.3466287255, 23.75), (-137.3466287255, 23.75), (-137.3466287255, 15.75), (-145.3466287255, 15.75), (-145.3466287255, -9.75), (-137.3466287255, -9.75), (-137.3466287255, -17.75), (-145.3466287255, -17.75), (-145.3466287255, -23.75), (-138.3466287255, -23.75), align=None)
        Polygon((-69.8466287255, 22.75), (-69.8466287255, 23.75), (-69.8466287255, 30.75), (-77.8466287255, 30.75), (-77.8466287255, 22.75), align=None)
        with Locations((-73.8466287255, 26.75)):
            Circle(F15_R, mode=Mode.SUBTRACT)
        with BuildLine():
            Line((-69.8466287255, 23.75), (-62.8466287255, 23.75))
            Line((-62.8466287255, 23.75), (-62.8466287255, 26.75))
            ThreePointArc((-62.8466287255, 26.75), (-64.0182016008, 29.5784271247), (-66.8466287255, 30.75))
            Line((-66.8466287255, 30.75), (-69.8466287255, 30.75))
            Line((-69.8466287255, 30.75), (-69.8466287255, 23.75))
        make_face()
        with Locations((-66.8466287255, 26.75)):
            Circle(F15_R_2, mode=Mode.SUBTRACT)
        with BuildLine():
            Line((-69.8466287255, -30.75), (-66.8466287255, -30.75))
            ThreePointArc((-66.8466287255, -30.75), (-64.0182016008, -29.5784271247), (-62.8466287255, -26.75))
            Line((-62.8466287255, -26.75), (-62.8466287255, -23.75))
            Line((-62.8466287255, -23.75), (-69.8466287255, -23.75))
            Line((-69.8466287255, -23.75), (-69.8466287255, -30.75))
        make_face()
        with Locations((-66.8466287255, -26.75)):
            Circle(F15_R_2, mode=Mode.SUBTRACT)
        with BuildLine():
            Line((-141.3466287255, -30.75), (-138.3466287255, -30.75))
            Line((-138.3466287255, -30.75), (-138.3466287255, -23.75))
            Line((-138.3466287255, -23.75), (-145.3466287255, -23.75))
            Line((-145.3466287255, -23.75), (-145.3466287255, -26.75))
            ThreePointArc((-145.3466287255, -26.75), (-144.1750558503, -29.5784271247), (-141.3466287255, -30.75))
        make_face()
        with Locations((-141.3466287255, -26.75)):
            Circle(F15_R_2, mode=Mode.SUBTRACT)
        with BuildLine():
            Line((-145.3466287255, 26.75), (-145.3466287255, 23.75))
            Line((-145.3466287255, 23.75), (-138.3466287255, 23.75))
            Line((-138.3466287255, 23.75), (-138.3466287255, 30.75))
            Line((-138.3466287255, 30.75), (-141.3466287255, 30.75))
            ThreePointArc((-141.3466287255, 30.75), (-144.1750558503, 29.5784271247), (-145.3466287255, 26.75))
        make_face()
        with Locations((-141.3466287255, 26.75)):
            Circle(F15_R_2, mode=Mode.SUBTRACT)
        with Locations((-66.8466287255, 26.75)):
            Circle(F15_R_2)
        with Locations((-66.8466287255, -26.75)):
            Circle(F15_R_2)
        with Locations((-141.3466287255, -26.75)):
            Circle(F15_R_2)
        with Locations((-141.3466287255, 26.75)):
            Circle(F15_R_2)
    extrude(amount=F16_DEPTH)

    # F15 (on Top) → F17 (join)
    with BuildSketch(Plane.XY):
        with BuildLine():
            Line((-59.8466287255, -26.75), (-59.8466287255, 26.75))
            ThreePointArc((-59.8466287255, 26.75), (-61.8968812572, 31.6997474683), (-66.8466287255, 33.75))
            Line((-66.8466287255, 33.75), (-141.3466287255, 33.75))
            ThreePointArc((-141.3466287255, 33.75), (-146.2963761938, 31.6997474683), (-148.3466287255, 26.75))
            Line((-148.3466287255, 26.75), (-148.3466287255, -26.75))
            ThreePointArc((-148.3466287255, -26.75), (-146.2963761938, -31.6997474683), (-141.3466287255, -33.75))
            Line((-141.3466287255, -33.75), (-66.8466287255, -33.75))
            ThreePointArc((-66.8466287255, -33.75), (-61.8968812572, -31.6997474683), (-59.8466287255, -26.75))
        make_face()
        with BuildLine():
            ThreePointArc((-62.8466287255, -26.75), (-64.0182016008, -29.5784271247), (-66.8466287255, -30.75))
            Line((-66.8466287255, -30.75), (-69.8466287255, -30.75))
            Line((-69.8466287255, -30.75), (-138.3466287255, -30.75))
            Line((-138.3466287255, -30.75), (-141.3466287255, -30.75))
            ThreePointArc((-141.3466287255, -30.75), (-144.1750558503, -29.5784271247), (-145.3466287255, -26.75))
            Line((-145.3466287255, -26.75), (-145.3466287255, -23.75))
            Line((-145.3466287255, -23.75), (-145.3466287255, -17.75))
            Line((-145.3466287255, -17.75), (-145.3466287255, -9.75))
            Line((-145.3466287255, -9.75), (-145.3466287255, 15.75))
            Line((-145.3466287255, 15.75), (-145.3466287255, 23.75))
            Line((-145.3466287255, 23.75), (-145.3466287255, 26.75))
            ThreePointArc((-145.3466287255, 26.75), (-144.1750558503, 29.5784271247), (-141.3466287255, 30.75))
            Line((-141.3466287255, 30.75), (-138.3466287255, 30.75))
            Line((-138.3466287255, 30.75), (-77.8466287255, 30.75))
            Line((-77.8466287255, 30.75), (-69.8466287255, 30.75))
            Line((-69.8466287255, 30.75), (-66.8466287255, 30.75))
            ThreePointArc((-66.8466287255, 30.75), (-64.0182016008, 29.5784271247), (-62.8466287255, 26.75))
            Line((-62.8466287255, 26.75), (-62.8466287255, 23.75))
            Line((-62.8466287255, 23.75), (-62.8466287255, 15.75))
            Line((-62.8466287255, 15.75), (-62.8466287255, -3.75))
            Line((-62.8466287255, -3.75), (-62.8466287255, -9.75))
            Line((-62.8466287255, -9.75), (-62.8466287255, -17.75))
            Line((-62.8466287255, -17.75), (-62.8466287255, -23.75))
            Line((-62.8466287255, -23.75), (-62.8466287255, -26.75))
        make_face(mode=Mode.SUBTRACT)
        with Locations((-141.3466287255, -13.75)):
            Rectangle(F15_W, F15_H)
        with Locations((-141.3466287255, -13.75)):
            Circle(F15_R, mode=Mode.SUBTRACT)
        Polygon((-145.3466287255, 23.75), (-145.3466287255, 15.75), (-137.3466287255, 15.75), (-137.3466287255, 23.75), (-138.3466287255, 23.75), align=None)
        with Locations((-141.3466287255, 19.75)):
            Circle(F15_R, mode=Mode.SUBTRACT)
        with Locations((-66.8466287255, -13.75)):
            Rectangle(F15_W, F15_H)
        with Locations((-66.8466287255, -13.75)):
            Circle(F15_R, mode=Mode.SUBTRACT)
        Polygon((-69.8466287255, 22.75), (-69.8466287255, 23.75), (-69.8466287255, 30.75), (-77.8466287255, 30.75), (-77.8466287255, 22.75), align=None)
        with Locations((-73.8466287255, 26.75)):
            Circle(F15_R, mode=Mode.SUBTRACT)
    extrude(amount=F17_DEPTH)

    # F18
    f18_edges = [f16.edges().sort_by_distance(p)[0] for p in [
        (-104.096629, -33.75, 0),
        (-61.896881, -31.699747, 0),
        (-59.846629, 0, 0),
        (-61.896881, 31.699747, 0),
        (-104.096629, 33.75, 0),
        (-146.296376, 31.699747, 0),
        (-148.346629, 0, 0),
        (-146.296376, -31.699747, 0),
    ]]
    chamfer(f18_edges, length=F18_SIZE)


solid = Compound([f1.part, f16.part])
